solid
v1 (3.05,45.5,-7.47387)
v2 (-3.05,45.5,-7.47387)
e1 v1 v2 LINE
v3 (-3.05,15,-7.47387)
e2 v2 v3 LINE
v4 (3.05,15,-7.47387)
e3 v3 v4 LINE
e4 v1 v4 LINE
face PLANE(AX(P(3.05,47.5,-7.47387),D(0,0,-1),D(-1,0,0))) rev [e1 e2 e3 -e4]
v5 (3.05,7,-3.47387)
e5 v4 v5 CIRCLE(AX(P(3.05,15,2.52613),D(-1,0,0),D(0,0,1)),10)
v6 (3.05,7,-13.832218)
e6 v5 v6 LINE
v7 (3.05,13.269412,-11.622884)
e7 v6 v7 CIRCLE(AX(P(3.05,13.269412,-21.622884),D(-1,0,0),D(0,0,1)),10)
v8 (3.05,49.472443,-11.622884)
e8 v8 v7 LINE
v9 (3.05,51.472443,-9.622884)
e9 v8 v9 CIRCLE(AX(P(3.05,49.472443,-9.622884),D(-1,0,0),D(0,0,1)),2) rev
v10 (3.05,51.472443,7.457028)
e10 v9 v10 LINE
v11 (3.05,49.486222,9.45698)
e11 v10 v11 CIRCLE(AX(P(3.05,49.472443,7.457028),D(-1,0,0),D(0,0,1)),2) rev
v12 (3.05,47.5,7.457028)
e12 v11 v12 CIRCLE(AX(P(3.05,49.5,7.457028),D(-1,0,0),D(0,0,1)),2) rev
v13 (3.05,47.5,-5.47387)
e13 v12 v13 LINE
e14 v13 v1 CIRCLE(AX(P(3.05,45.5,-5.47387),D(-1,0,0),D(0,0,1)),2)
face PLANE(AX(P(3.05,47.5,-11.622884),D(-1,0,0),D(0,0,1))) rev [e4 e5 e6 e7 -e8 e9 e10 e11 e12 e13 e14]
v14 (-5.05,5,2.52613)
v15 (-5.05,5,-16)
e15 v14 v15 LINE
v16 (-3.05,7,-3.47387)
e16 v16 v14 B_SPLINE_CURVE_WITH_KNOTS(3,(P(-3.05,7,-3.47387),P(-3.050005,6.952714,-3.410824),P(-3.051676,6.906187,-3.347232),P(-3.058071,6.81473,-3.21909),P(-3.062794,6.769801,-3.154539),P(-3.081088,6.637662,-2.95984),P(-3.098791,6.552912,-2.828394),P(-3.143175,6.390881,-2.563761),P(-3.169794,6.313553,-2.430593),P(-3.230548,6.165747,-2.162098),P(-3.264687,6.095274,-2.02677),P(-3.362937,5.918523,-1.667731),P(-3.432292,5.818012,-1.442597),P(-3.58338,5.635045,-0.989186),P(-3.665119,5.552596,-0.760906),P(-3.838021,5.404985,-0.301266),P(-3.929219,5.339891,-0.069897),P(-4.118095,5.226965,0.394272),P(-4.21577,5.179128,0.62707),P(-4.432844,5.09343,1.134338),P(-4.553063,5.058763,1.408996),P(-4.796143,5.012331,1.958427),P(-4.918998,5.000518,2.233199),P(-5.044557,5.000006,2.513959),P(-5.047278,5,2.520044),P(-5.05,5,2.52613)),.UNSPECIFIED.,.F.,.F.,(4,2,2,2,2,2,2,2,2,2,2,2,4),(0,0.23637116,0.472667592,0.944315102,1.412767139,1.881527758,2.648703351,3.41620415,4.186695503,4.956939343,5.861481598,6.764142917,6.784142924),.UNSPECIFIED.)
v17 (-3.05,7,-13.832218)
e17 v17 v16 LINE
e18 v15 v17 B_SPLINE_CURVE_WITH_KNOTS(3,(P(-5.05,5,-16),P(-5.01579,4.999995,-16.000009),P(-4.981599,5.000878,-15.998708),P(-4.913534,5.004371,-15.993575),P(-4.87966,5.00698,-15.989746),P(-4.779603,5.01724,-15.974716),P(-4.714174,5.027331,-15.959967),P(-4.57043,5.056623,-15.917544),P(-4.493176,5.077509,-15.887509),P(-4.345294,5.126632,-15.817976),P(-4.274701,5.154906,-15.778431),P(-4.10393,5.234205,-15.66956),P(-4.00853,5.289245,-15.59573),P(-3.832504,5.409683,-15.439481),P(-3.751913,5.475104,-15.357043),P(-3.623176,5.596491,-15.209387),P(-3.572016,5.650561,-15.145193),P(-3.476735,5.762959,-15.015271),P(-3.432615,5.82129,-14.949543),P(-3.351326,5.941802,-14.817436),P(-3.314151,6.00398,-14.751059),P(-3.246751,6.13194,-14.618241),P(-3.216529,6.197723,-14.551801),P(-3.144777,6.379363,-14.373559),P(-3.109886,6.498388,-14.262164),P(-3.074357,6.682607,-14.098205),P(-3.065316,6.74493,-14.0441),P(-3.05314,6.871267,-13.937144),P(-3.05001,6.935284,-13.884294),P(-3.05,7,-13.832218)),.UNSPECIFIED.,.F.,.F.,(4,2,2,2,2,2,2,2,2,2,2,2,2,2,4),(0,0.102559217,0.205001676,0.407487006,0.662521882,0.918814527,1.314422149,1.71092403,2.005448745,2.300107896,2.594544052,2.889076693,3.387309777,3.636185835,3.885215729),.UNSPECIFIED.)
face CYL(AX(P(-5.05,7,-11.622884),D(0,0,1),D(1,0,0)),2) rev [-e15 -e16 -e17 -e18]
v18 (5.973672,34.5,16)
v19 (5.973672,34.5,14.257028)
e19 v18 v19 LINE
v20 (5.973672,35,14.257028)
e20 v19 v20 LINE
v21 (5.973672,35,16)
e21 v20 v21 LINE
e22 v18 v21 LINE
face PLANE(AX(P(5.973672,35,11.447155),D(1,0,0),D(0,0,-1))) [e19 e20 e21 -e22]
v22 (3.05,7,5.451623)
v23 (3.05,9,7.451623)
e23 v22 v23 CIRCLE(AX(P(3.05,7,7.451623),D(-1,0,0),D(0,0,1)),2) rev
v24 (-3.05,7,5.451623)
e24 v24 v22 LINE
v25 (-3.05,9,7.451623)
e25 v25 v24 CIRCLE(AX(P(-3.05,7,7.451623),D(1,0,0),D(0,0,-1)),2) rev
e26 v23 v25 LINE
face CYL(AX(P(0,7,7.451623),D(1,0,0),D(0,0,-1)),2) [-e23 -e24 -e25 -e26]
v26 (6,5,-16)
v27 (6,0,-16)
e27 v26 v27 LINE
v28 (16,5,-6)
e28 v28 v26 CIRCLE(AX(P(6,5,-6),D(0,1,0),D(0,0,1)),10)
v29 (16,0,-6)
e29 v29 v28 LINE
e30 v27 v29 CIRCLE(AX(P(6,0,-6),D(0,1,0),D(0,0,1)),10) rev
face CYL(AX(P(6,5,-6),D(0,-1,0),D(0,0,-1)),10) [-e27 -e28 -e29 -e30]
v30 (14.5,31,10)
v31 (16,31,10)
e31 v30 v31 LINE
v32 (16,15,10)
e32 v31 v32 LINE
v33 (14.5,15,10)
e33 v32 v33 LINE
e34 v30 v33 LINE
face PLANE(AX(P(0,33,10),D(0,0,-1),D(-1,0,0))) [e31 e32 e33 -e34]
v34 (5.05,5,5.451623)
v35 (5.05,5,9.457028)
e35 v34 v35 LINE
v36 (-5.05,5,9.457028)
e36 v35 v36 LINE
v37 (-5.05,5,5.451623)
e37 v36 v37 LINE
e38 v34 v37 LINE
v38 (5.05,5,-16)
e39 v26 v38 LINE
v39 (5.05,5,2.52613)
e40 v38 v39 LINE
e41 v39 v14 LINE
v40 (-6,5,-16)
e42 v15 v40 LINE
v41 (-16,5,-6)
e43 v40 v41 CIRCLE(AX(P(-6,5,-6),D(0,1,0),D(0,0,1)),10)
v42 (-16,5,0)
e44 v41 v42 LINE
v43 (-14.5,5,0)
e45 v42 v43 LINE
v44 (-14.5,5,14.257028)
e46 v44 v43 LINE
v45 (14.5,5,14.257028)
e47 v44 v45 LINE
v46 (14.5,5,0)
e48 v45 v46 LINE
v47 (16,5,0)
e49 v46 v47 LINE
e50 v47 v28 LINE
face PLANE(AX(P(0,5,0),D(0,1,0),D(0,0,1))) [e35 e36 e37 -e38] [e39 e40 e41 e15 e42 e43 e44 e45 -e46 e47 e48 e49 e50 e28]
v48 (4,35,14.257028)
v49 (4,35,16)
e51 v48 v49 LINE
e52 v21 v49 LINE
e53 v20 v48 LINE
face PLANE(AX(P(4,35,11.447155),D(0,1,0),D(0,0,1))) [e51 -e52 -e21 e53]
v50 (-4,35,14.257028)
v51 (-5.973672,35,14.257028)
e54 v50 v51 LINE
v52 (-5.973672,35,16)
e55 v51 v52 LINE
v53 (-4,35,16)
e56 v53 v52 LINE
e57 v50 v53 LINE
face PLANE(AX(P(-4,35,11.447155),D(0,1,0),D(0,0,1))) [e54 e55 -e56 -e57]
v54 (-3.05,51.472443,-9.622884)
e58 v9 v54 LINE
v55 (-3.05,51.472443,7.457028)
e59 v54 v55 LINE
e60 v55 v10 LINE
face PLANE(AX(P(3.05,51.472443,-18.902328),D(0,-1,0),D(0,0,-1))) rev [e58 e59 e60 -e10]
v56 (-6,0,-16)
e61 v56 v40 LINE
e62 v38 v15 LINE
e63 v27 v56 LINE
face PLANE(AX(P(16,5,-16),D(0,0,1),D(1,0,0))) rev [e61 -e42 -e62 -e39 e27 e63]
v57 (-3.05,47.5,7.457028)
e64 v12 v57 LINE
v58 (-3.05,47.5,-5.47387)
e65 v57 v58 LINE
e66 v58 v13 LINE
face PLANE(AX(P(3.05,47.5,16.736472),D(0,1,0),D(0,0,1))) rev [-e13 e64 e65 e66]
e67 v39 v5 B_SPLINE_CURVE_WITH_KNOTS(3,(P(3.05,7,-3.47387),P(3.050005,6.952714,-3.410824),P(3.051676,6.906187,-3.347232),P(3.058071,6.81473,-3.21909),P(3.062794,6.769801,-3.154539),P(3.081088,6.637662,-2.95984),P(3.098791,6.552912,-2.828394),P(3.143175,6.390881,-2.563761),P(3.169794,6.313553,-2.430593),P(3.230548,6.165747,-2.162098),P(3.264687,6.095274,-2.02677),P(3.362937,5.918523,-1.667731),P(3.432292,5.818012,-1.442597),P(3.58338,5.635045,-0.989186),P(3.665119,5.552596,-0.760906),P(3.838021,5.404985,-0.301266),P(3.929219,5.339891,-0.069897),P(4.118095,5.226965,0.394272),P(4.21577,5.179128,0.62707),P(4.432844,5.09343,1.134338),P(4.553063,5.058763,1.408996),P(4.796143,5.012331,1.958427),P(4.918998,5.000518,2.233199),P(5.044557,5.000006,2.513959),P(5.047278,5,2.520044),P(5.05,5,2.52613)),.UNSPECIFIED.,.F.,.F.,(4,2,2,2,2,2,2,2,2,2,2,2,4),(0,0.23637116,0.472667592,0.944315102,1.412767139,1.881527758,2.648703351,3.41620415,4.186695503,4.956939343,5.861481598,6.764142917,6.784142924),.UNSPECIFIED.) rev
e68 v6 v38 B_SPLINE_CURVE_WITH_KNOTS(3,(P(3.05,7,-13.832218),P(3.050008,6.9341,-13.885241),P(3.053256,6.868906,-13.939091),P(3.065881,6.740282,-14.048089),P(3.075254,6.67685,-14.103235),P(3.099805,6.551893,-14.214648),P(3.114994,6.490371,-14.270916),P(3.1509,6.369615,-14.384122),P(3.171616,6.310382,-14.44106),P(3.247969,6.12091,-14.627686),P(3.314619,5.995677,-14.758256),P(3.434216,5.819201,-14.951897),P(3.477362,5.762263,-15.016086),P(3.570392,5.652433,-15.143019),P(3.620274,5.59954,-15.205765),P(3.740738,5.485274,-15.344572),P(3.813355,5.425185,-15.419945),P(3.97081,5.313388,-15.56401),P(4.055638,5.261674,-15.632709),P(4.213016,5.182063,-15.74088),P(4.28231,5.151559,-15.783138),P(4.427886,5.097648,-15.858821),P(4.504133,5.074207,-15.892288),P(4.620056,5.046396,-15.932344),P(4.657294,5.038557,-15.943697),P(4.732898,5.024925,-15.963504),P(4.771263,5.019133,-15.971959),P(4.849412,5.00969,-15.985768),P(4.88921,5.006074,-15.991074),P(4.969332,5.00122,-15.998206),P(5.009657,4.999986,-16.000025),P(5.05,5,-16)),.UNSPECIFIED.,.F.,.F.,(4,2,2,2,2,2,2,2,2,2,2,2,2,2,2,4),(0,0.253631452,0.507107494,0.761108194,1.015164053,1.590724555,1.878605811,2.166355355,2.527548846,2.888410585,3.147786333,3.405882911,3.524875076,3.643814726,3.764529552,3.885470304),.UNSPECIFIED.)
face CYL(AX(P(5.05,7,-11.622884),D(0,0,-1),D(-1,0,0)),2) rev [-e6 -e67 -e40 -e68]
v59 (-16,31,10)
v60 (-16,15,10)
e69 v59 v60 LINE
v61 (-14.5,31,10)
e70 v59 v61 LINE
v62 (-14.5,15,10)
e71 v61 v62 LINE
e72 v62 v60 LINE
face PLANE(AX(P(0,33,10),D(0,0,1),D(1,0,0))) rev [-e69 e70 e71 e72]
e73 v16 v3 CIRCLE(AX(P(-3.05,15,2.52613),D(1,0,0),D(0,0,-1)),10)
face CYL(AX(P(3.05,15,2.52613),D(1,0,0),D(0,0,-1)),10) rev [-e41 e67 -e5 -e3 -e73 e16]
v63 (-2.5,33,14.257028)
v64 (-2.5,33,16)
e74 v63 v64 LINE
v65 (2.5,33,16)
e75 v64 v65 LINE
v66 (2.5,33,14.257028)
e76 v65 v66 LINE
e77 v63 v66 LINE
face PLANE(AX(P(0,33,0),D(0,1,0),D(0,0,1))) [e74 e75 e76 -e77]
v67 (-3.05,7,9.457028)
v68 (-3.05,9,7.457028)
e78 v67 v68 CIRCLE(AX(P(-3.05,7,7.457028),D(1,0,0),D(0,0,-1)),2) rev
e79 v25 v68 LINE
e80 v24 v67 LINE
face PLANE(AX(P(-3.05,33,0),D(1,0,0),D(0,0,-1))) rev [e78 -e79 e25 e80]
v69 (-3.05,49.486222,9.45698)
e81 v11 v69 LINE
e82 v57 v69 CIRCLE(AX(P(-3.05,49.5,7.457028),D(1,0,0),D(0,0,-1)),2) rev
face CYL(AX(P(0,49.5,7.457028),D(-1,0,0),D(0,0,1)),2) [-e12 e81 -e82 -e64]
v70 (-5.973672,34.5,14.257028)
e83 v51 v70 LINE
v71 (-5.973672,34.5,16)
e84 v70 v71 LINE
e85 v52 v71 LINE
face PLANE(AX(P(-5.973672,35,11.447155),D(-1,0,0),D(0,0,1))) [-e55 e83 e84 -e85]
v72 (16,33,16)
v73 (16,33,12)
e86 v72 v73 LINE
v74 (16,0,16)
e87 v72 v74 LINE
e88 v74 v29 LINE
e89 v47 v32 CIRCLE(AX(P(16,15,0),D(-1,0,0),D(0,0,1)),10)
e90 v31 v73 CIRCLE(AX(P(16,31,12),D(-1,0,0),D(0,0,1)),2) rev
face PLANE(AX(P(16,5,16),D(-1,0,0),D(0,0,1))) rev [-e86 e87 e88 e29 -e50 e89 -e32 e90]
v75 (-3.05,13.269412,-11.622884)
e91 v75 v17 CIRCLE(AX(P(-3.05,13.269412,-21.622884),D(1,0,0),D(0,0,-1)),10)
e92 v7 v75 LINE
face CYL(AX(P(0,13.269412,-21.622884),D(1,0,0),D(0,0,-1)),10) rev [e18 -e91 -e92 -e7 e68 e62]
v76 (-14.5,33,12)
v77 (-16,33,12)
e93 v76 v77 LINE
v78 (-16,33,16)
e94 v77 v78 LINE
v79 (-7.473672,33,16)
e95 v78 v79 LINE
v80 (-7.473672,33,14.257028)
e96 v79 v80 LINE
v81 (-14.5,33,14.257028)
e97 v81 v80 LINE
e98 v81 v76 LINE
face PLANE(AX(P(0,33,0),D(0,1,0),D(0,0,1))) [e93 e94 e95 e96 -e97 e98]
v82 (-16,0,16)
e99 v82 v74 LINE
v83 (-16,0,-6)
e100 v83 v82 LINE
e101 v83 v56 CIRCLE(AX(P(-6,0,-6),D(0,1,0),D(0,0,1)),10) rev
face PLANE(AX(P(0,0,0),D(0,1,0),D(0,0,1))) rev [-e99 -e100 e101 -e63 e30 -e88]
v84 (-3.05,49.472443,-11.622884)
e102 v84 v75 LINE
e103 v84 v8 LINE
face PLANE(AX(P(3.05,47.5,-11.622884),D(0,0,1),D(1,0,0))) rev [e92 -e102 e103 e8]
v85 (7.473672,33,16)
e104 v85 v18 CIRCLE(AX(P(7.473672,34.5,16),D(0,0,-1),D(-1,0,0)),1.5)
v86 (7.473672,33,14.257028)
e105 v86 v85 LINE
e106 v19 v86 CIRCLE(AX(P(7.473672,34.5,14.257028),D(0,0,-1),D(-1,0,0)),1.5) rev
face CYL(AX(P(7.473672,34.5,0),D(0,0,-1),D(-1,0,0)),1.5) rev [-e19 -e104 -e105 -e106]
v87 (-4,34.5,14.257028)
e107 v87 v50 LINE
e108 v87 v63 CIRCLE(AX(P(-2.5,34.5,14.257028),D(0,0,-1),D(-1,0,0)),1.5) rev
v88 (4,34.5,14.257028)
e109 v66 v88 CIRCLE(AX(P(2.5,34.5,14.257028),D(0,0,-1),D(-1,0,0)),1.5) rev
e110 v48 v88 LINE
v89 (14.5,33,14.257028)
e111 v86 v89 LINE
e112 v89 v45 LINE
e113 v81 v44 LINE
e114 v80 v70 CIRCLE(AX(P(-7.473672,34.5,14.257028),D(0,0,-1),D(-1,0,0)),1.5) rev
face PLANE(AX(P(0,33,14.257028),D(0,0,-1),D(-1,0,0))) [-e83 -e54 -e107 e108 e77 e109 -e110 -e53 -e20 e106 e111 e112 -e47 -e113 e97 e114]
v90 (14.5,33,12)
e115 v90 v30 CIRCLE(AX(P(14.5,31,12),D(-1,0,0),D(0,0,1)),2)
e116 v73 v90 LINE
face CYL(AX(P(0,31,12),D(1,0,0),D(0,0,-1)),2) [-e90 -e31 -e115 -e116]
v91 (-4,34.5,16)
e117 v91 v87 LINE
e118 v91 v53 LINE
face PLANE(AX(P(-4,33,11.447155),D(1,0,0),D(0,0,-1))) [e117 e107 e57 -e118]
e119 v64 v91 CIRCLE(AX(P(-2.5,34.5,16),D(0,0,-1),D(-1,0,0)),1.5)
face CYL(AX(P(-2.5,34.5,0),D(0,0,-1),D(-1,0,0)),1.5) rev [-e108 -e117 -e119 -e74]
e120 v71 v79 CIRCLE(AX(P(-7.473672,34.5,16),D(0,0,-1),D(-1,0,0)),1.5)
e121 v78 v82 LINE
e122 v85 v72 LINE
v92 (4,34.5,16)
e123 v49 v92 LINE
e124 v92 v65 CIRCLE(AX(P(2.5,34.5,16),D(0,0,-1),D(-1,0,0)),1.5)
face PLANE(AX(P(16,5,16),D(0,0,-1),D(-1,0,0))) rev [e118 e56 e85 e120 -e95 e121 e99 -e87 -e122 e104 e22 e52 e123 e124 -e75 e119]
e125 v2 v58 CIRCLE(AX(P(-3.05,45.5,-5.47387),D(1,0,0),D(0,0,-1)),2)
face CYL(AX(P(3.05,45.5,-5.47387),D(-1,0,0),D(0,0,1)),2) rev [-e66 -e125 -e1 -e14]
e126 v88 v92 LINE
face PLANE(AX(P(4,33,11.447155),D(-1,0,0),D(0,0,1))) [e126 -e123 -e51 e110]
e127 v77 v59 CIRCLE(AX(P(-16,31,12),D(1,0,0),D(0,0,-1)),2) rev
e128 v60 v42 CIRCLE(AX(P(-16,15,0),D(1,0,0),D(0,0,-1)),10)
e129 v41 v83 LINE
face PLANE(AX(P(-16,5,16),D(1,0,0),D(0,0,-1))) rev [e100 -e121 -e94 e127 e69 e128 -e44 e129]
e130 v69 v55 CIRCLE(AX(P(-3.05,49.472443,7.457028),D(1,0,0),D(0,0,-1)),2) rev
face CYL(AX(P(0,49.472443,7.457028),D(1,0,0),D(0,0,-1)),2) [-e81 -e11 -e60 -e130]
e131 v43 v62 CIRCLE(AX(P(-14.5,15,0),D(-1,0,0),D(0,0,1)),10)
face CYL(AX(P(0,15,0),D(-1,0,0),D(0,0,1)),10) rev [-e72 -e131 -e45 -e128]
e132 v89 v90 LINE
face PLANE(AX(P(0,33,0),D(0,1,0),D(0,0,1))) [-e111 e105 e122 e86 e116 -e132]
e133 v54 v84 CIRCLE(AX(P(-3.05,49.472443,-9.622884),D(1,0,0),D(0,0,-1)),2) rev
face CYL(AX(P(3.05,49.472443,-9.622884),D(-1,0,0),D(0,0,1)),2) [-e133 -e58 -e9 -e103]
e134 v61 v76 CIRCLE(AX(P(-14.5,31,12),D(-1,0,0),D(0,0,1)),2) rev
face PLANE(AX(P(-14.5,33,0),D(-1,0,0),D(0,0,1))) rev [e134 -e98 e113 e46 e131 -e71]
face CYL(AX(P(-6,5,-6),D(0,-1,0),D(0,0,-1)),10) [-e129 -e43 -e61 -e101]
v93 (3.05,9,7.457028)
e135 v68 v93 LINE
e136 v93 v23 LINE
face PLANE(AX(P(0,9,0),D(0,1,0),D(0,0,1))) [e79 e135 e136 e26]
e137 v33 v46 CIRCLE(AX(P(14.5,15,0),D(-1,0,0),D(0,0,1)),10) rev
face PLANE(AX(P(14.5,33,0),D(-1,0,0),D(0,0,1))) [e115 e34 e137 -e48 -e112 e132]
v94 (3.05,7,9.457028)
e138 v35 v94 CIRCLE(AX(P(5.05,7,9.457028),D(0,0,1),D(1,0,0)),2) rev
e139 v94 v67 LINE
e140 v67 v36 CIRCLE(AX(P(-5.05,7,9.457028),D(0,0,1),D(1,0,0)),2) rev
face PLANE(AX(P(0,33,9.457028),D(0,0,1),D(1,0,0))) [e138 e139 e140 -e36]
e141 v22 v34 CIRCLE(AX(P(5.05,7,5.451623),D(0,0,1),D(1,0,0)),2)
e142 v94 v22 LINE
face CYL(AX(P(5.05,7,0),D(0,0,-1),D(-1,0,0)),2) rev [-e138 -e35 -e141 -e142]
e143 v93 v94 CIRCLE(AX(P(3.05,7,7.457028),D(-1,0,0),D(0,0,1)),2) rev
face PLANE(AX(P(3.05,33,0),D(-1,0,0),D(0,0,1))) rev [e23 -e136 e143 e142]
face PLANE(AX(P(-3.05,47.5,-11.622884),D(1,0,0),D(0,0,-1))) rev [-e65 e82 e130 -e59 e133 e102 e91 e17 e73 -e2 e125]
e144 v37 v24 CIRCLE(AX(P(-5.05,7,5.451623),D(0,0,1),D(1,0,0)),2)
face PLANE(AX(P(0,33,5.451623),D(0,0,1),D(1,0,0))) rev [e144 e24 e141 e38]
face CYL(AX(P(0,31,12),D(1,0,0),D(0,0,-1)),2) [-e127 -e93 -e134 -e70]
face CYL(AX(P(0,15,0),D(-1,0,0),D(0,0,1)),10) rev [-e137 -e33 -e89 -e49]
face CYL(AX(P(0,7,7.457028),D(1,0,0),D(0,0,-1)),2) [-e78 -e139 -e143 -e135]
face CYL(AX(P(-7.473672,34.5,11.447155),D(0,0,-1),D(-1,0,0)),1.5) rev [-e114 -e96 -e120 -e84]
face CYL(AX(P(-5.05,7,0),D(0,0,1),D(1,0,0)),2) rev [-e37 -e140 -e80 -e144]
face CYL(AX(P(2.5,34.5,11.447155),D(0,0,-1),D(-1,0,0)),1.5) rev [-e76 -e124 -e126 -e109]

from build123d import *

# Parameters (mm, degrees)
SKETCH1_W           = 32
SKETCH1_H           = 32
BOSS_EXTRUDE1_DEPTH = 5
BOSS_EXTRUDE5_DEPTH = 28
SKETCH6_W           = 6.1
SKETCH6_H           = 4.005404858
CUT_EXTRUDE2_DEPTH  = 24
SKETCH7_W           = 1.973672473
SKETCH7_H           = 2
BOSS_EXTRUDE6_DEPTH = 1.742972258
FILLET1_R           = 1.5
SKETCH8_W           = 6.1
SKETCH8_H           = 4.149014421
BOSS_EXTRUDE7_DEPTH = 42.5
SKETCH9_W           = 6.1
SKETCH9_H           = 3.972443091
BOSS_EXTRUDE8_DEPTH = 16.930897648
SKETCH10_W          = 6.1
SKETCH10_H          = 3.972443091
BOSS_EXTRUDE9_DEPTH = 4.149014421
FILLET3_R           = 2
FILLET5_R           = 10
FILLET6_R           = 2
FILLET7_R           = 10


with BuildPart() as part:
    # Sketch1 → Boss-Extrude1 (new body)
    with BuildSketch(Plane(origin=(0, 0, 0), x_dir=(1, 0, 0), z_dir=(0, 1, 0))):
        Rectangle(SKETCH1_W, SKETCH1_H)
    extrude(amount=BOSS_EXTRUDE1_DEPTH)

    # Sketch2 → Boss-Extrude5 (add)
    with BuildSketch(Plane(origin=(0, 5, 0), x_dir=(1, 0, 0), z_dir=(0, 1, 0))):
        Polygon((3.05, -5.451622884), (-3.05, -5.451622884), (-3.05, -9.457027742), (0, -9.457027742), (3.05, -9.457027742), align=None)
        Polygon((-14.5, -16), (0, -16), (14.5, -16), (16, -16), (16, -10), (14.5, -10), (14.5, -14.257027742), (0, -14.257027742), (-14.5, -14.257027742), (-14.5, -10), (-16, -10), (-16, -16), align=None)
    extrude(amount=BOSS_EXTRUDE5_DEPTH)

    # Sketch6 → Cut-Extrude2 (cut)
    with BuildSketch(Plane(origin=(0, 33, 0), x_dir=(1, 0, 0), z_dir=(0, 1, 0))):
        with Locations((0, -7.454325313)):
            Rectangle(SKETCH6_W, SKETCH6_H)
    extrude(amount=-CUT_EXTRUDE2_DEPTH, mode=Mode.SUBTRACT)

    # Sketch7 → Boss-Extrude6 (add)
    with BuildSketch(Plane.XY.offset(16)):
        with Locations((-4.986836237, 34)):
            Rectangle(SKETCH7_W, SKETCH7_H)
        with Locations((4.986836237, 34)):
            Rectangle(SKETCH7_W, SKETCH7_H)
    extrude(amount=-BOSS_EXTRUDE6_DEPTH)

    # Fillet1
    fillet1_edges = [part.edges().sort_by_distance(p)[0] for p in [
        (-5.973672473, 33, 15.128513871),
        (-4, 33, 15.128513871),
        (5.973672473, 33, 15.128513871),
        (4, 33, 15.128513871),
    ]]
    fillet(fillet1_edges, radius=FILLET1_R)

    # Sketch8 → Boss-Extrude7 (add)
    with BuildSketch(Plane(origin=(0, 5, 0), x_dir=(1, 0, 0), z_dir=(0, 1, 0))):
        with Locations((0, 9.548377117)):
            Rectangle(SKETCH8_W, SKETCH8_H)
    extrude(amount=BOSS_EXTRUDE7_DEPTH)



with BuildPart() as body_2:
    # Sketch9 → Boss-Extrude8 (new body)
    with BuildSketch(Plane.XY.offset(-7.473869906)):
        with Locations((0, 49.486221546)):
            Rectangle(SKETCH9_W, SKETCH9_H)
    extrude(amount=BOSS_EXTRUDE8_DEPTH)


with BuildPart() as part_1:
    add(part.part)

    add(body_2.part)  # Boss-Extrude9 merges body 2
    # Sketch10 → Boss-Extrude9 (add)
    with BuildSketch(Plane(origin=(0, 0, -7.473869906), x_dir=(-1, 0, 0), z_dir=(0, 0, -1))):
        with Locations((0, 49.486221546)):
            Rectangle(SKETCH10_W, SKETCH10_H)
    extrude(amount=BOSS_EXTRUDE9_DEPTH)

    # Fillet3
    # the kernel refuses this fillet: 2 mm, written as the material it adds along each edge
    with BuildSketch(Plane(origin=(3.05, 47.5, -7.473869906), x_dir=(0, 0, 1), z_dir=(-1, 0, 0))) as fillet3_piece_1:
        with BuildLine():
            CenterArc((FILLET3_R, -FILLET3_R), FILLET3_R, 90, 90)
            Line((0, -FILLET3_R), (0, 0))
            Line((0, 0), (FILLET3_R, 0))
        make_face()
    extrude(amount=6.1)
    # the kernel refuses this fillet: 2 mm, written as the material it takes off along each edge
    with BuildSketch(Plane(origin=(8.05, 51.472443091, -11.622884327), x_dir=(0, -1, 0), z_dir=(-1, 0, 0)), Plane(origin=(-8.05, 51.472443091, 9.457027742), x_dir=(0, -1, 0), z_dir=(1, 0, 0))) as fillet3_2_piece_1:
        with BuildLine():
            CenterArc((FILLET3_R, FILLET3_R), FILLET3_R, 180, 90)
            Line((0, FILLET3_R), (0, 0))
            Line((0, 0), (FILLET3_R, 0))
        make_face()
    extrude(amount=16.1, mode=Mode.SUBTRACT)
    with BuildSketch(Plane(origin=(8.05, 47.5, 9.457027742), x_dir=(0, 0, -1), z_dir=(-1, 0, 0)), Plane(origin=(-8.05, 9, 5.451622884), x_dir=(0, -1, 0), z_dir=(1, 0, 0)), Plane(origin=(8.05, 9, 9.457027742), x_dir=(0, -1, 0), z_dir=(-1, 0, 0))) as fillet3_2_piece_2:
        with BuildLine():
            CenterArc((FILLET3_R, -FILLET3_R), FILLET3_R, 90, 90)
            Line((0, -FILLET3_R), (0, 0))
            Line((0, 0), (FILLET3_R, 0))
        make_face()
    extrude(amount=16.1, mode=Mode.SUBTRACT)
    with BuildSketch(Plane(origin=(21, 33, 10), x_dir=(0, 0, 1), z_dir=(-1, 0, 0)), Plane(origin=(-9.5, 33, 10), x_dir=(0, 0, 1), z_dir=(-1, 0, 0))) as fillet3_2_piece_3:
        with BuildLine():
            CenterArc((FILLET3_R, -FILLET3_R), FILLET3_R, 90, 90)
            Line((0, -FILLET3_R), (0, 0))
            Line((0, 0), (FILLET3_R, 0))
        make_face()
    extrude(amount=11.5, mode=Mode.SUBTRACT)

    # Fillet5
    # the kernel refuses this fillet: 10 mm, written as the material it adds along each edge
    with BuildSketch(Plane(origin=(-3.05, 5, -7.473869906), x_dir=(0, 1, 0), z_dir=(1, 0, 0))) as fillet5_piece_1:
        with BuildLine():
            CenterArc((FILLET5_R, FILLET5_R), FILLET5_R, 180, 90)
            Line((0, FILLET5_R), (-FILLET5_R * 0.02, FILLET5_R))
            Line((-FILLET5_R * 0.02, FILLET5_R), (-FILLET5_R * 0.02, -FILLET5_R * 0.02))
            Line((-FILLET5_R * 0.02, -FILLET5_R * 0.02), (FILLET5_R, -FILLET5_R * 0.02))
            Line((FILLET5_R, -FILLET5_R * 0.02), (FILLET5_R, 0))
        make_face()
    extrude(amount=6.1)
    with BuildSketch(Plane(origin=(3.05, 5, -11.622884327), x_dir=(0, 0, -1), z_dir=(-1, 0, 0))) as fillet5_piece_2:
        with BuildLine():
            CenterArc((10, -8.26941182), FILLET5_R, 124.214206314, 55.785793686)
            Line((0, -8.26941182), (-0.2, -8.26941182))
            Line((-0.2, -8.26941182), (-0.2, 0))
            Line((-0.2, 0), (0, 0.2))
            ThreePointArc((0, 0.2), (2.188557837, 0.2), (4.264657987, 0.165388236))
            Line((4.264657987, 0.165388236), (4.377115673, 0))
        make_face()
    extrude(amount=6.1)
    with BuildSketch(Plane(origin=(-14.5, 5, 10), x_dir=(0, 0, -1), z_dir=(-1, 0, 0)), Plane(origin=(16, 5, 10), x_dir=(0, 0, -1), z_dir=(-1, 0, 0))) as fillet5_piece_3:
        with BuildLine():
            CenterArc((FILLET5_R, -FILLET5_R), FILLET5_R, 90, 90)
            Line((0, -FILLET5_R), (-FILLET5_R * 0.02, -FILLET5_R))
            Line((-FILLET5_R * 0.02, -FILLET5_R), (-FILLET5_R * 0.02, FILLET5_R * 0.02))
            Line((-FILLET5_R * 0.02, FILLET5_R * 0.02), (FILLET5_R, FILLET5_R * 0.02))
            Line((FILLET5_R, FILLET5_R * 0.02), (FILLET5_R, 0))
        make_face()
    extrude(amount=1.5)

    # Fillet6
    fillet6_edges = [part_1.edges().sort_by_distance(p)[0] for p in [
        (-3.05, 5, -6.736934953),
        (-3.05, 5, 7.454325313),
        (3.05, 5, -6.736934953),
        (3.05, 5, 7.454325313),
    ]]
    fillet(fillet6_edges, radius=FILLET6_R)

    # Fillet7
    fillet7_edges = [part_1.edges().sort_by_distance(p)[0] for p in [
        (-16, 2.5, -16),
        (16, 2.5, -16),
    ]]
    fillet(fillet7_edges, radius=FILLET7_R)


solid = part_1.part
